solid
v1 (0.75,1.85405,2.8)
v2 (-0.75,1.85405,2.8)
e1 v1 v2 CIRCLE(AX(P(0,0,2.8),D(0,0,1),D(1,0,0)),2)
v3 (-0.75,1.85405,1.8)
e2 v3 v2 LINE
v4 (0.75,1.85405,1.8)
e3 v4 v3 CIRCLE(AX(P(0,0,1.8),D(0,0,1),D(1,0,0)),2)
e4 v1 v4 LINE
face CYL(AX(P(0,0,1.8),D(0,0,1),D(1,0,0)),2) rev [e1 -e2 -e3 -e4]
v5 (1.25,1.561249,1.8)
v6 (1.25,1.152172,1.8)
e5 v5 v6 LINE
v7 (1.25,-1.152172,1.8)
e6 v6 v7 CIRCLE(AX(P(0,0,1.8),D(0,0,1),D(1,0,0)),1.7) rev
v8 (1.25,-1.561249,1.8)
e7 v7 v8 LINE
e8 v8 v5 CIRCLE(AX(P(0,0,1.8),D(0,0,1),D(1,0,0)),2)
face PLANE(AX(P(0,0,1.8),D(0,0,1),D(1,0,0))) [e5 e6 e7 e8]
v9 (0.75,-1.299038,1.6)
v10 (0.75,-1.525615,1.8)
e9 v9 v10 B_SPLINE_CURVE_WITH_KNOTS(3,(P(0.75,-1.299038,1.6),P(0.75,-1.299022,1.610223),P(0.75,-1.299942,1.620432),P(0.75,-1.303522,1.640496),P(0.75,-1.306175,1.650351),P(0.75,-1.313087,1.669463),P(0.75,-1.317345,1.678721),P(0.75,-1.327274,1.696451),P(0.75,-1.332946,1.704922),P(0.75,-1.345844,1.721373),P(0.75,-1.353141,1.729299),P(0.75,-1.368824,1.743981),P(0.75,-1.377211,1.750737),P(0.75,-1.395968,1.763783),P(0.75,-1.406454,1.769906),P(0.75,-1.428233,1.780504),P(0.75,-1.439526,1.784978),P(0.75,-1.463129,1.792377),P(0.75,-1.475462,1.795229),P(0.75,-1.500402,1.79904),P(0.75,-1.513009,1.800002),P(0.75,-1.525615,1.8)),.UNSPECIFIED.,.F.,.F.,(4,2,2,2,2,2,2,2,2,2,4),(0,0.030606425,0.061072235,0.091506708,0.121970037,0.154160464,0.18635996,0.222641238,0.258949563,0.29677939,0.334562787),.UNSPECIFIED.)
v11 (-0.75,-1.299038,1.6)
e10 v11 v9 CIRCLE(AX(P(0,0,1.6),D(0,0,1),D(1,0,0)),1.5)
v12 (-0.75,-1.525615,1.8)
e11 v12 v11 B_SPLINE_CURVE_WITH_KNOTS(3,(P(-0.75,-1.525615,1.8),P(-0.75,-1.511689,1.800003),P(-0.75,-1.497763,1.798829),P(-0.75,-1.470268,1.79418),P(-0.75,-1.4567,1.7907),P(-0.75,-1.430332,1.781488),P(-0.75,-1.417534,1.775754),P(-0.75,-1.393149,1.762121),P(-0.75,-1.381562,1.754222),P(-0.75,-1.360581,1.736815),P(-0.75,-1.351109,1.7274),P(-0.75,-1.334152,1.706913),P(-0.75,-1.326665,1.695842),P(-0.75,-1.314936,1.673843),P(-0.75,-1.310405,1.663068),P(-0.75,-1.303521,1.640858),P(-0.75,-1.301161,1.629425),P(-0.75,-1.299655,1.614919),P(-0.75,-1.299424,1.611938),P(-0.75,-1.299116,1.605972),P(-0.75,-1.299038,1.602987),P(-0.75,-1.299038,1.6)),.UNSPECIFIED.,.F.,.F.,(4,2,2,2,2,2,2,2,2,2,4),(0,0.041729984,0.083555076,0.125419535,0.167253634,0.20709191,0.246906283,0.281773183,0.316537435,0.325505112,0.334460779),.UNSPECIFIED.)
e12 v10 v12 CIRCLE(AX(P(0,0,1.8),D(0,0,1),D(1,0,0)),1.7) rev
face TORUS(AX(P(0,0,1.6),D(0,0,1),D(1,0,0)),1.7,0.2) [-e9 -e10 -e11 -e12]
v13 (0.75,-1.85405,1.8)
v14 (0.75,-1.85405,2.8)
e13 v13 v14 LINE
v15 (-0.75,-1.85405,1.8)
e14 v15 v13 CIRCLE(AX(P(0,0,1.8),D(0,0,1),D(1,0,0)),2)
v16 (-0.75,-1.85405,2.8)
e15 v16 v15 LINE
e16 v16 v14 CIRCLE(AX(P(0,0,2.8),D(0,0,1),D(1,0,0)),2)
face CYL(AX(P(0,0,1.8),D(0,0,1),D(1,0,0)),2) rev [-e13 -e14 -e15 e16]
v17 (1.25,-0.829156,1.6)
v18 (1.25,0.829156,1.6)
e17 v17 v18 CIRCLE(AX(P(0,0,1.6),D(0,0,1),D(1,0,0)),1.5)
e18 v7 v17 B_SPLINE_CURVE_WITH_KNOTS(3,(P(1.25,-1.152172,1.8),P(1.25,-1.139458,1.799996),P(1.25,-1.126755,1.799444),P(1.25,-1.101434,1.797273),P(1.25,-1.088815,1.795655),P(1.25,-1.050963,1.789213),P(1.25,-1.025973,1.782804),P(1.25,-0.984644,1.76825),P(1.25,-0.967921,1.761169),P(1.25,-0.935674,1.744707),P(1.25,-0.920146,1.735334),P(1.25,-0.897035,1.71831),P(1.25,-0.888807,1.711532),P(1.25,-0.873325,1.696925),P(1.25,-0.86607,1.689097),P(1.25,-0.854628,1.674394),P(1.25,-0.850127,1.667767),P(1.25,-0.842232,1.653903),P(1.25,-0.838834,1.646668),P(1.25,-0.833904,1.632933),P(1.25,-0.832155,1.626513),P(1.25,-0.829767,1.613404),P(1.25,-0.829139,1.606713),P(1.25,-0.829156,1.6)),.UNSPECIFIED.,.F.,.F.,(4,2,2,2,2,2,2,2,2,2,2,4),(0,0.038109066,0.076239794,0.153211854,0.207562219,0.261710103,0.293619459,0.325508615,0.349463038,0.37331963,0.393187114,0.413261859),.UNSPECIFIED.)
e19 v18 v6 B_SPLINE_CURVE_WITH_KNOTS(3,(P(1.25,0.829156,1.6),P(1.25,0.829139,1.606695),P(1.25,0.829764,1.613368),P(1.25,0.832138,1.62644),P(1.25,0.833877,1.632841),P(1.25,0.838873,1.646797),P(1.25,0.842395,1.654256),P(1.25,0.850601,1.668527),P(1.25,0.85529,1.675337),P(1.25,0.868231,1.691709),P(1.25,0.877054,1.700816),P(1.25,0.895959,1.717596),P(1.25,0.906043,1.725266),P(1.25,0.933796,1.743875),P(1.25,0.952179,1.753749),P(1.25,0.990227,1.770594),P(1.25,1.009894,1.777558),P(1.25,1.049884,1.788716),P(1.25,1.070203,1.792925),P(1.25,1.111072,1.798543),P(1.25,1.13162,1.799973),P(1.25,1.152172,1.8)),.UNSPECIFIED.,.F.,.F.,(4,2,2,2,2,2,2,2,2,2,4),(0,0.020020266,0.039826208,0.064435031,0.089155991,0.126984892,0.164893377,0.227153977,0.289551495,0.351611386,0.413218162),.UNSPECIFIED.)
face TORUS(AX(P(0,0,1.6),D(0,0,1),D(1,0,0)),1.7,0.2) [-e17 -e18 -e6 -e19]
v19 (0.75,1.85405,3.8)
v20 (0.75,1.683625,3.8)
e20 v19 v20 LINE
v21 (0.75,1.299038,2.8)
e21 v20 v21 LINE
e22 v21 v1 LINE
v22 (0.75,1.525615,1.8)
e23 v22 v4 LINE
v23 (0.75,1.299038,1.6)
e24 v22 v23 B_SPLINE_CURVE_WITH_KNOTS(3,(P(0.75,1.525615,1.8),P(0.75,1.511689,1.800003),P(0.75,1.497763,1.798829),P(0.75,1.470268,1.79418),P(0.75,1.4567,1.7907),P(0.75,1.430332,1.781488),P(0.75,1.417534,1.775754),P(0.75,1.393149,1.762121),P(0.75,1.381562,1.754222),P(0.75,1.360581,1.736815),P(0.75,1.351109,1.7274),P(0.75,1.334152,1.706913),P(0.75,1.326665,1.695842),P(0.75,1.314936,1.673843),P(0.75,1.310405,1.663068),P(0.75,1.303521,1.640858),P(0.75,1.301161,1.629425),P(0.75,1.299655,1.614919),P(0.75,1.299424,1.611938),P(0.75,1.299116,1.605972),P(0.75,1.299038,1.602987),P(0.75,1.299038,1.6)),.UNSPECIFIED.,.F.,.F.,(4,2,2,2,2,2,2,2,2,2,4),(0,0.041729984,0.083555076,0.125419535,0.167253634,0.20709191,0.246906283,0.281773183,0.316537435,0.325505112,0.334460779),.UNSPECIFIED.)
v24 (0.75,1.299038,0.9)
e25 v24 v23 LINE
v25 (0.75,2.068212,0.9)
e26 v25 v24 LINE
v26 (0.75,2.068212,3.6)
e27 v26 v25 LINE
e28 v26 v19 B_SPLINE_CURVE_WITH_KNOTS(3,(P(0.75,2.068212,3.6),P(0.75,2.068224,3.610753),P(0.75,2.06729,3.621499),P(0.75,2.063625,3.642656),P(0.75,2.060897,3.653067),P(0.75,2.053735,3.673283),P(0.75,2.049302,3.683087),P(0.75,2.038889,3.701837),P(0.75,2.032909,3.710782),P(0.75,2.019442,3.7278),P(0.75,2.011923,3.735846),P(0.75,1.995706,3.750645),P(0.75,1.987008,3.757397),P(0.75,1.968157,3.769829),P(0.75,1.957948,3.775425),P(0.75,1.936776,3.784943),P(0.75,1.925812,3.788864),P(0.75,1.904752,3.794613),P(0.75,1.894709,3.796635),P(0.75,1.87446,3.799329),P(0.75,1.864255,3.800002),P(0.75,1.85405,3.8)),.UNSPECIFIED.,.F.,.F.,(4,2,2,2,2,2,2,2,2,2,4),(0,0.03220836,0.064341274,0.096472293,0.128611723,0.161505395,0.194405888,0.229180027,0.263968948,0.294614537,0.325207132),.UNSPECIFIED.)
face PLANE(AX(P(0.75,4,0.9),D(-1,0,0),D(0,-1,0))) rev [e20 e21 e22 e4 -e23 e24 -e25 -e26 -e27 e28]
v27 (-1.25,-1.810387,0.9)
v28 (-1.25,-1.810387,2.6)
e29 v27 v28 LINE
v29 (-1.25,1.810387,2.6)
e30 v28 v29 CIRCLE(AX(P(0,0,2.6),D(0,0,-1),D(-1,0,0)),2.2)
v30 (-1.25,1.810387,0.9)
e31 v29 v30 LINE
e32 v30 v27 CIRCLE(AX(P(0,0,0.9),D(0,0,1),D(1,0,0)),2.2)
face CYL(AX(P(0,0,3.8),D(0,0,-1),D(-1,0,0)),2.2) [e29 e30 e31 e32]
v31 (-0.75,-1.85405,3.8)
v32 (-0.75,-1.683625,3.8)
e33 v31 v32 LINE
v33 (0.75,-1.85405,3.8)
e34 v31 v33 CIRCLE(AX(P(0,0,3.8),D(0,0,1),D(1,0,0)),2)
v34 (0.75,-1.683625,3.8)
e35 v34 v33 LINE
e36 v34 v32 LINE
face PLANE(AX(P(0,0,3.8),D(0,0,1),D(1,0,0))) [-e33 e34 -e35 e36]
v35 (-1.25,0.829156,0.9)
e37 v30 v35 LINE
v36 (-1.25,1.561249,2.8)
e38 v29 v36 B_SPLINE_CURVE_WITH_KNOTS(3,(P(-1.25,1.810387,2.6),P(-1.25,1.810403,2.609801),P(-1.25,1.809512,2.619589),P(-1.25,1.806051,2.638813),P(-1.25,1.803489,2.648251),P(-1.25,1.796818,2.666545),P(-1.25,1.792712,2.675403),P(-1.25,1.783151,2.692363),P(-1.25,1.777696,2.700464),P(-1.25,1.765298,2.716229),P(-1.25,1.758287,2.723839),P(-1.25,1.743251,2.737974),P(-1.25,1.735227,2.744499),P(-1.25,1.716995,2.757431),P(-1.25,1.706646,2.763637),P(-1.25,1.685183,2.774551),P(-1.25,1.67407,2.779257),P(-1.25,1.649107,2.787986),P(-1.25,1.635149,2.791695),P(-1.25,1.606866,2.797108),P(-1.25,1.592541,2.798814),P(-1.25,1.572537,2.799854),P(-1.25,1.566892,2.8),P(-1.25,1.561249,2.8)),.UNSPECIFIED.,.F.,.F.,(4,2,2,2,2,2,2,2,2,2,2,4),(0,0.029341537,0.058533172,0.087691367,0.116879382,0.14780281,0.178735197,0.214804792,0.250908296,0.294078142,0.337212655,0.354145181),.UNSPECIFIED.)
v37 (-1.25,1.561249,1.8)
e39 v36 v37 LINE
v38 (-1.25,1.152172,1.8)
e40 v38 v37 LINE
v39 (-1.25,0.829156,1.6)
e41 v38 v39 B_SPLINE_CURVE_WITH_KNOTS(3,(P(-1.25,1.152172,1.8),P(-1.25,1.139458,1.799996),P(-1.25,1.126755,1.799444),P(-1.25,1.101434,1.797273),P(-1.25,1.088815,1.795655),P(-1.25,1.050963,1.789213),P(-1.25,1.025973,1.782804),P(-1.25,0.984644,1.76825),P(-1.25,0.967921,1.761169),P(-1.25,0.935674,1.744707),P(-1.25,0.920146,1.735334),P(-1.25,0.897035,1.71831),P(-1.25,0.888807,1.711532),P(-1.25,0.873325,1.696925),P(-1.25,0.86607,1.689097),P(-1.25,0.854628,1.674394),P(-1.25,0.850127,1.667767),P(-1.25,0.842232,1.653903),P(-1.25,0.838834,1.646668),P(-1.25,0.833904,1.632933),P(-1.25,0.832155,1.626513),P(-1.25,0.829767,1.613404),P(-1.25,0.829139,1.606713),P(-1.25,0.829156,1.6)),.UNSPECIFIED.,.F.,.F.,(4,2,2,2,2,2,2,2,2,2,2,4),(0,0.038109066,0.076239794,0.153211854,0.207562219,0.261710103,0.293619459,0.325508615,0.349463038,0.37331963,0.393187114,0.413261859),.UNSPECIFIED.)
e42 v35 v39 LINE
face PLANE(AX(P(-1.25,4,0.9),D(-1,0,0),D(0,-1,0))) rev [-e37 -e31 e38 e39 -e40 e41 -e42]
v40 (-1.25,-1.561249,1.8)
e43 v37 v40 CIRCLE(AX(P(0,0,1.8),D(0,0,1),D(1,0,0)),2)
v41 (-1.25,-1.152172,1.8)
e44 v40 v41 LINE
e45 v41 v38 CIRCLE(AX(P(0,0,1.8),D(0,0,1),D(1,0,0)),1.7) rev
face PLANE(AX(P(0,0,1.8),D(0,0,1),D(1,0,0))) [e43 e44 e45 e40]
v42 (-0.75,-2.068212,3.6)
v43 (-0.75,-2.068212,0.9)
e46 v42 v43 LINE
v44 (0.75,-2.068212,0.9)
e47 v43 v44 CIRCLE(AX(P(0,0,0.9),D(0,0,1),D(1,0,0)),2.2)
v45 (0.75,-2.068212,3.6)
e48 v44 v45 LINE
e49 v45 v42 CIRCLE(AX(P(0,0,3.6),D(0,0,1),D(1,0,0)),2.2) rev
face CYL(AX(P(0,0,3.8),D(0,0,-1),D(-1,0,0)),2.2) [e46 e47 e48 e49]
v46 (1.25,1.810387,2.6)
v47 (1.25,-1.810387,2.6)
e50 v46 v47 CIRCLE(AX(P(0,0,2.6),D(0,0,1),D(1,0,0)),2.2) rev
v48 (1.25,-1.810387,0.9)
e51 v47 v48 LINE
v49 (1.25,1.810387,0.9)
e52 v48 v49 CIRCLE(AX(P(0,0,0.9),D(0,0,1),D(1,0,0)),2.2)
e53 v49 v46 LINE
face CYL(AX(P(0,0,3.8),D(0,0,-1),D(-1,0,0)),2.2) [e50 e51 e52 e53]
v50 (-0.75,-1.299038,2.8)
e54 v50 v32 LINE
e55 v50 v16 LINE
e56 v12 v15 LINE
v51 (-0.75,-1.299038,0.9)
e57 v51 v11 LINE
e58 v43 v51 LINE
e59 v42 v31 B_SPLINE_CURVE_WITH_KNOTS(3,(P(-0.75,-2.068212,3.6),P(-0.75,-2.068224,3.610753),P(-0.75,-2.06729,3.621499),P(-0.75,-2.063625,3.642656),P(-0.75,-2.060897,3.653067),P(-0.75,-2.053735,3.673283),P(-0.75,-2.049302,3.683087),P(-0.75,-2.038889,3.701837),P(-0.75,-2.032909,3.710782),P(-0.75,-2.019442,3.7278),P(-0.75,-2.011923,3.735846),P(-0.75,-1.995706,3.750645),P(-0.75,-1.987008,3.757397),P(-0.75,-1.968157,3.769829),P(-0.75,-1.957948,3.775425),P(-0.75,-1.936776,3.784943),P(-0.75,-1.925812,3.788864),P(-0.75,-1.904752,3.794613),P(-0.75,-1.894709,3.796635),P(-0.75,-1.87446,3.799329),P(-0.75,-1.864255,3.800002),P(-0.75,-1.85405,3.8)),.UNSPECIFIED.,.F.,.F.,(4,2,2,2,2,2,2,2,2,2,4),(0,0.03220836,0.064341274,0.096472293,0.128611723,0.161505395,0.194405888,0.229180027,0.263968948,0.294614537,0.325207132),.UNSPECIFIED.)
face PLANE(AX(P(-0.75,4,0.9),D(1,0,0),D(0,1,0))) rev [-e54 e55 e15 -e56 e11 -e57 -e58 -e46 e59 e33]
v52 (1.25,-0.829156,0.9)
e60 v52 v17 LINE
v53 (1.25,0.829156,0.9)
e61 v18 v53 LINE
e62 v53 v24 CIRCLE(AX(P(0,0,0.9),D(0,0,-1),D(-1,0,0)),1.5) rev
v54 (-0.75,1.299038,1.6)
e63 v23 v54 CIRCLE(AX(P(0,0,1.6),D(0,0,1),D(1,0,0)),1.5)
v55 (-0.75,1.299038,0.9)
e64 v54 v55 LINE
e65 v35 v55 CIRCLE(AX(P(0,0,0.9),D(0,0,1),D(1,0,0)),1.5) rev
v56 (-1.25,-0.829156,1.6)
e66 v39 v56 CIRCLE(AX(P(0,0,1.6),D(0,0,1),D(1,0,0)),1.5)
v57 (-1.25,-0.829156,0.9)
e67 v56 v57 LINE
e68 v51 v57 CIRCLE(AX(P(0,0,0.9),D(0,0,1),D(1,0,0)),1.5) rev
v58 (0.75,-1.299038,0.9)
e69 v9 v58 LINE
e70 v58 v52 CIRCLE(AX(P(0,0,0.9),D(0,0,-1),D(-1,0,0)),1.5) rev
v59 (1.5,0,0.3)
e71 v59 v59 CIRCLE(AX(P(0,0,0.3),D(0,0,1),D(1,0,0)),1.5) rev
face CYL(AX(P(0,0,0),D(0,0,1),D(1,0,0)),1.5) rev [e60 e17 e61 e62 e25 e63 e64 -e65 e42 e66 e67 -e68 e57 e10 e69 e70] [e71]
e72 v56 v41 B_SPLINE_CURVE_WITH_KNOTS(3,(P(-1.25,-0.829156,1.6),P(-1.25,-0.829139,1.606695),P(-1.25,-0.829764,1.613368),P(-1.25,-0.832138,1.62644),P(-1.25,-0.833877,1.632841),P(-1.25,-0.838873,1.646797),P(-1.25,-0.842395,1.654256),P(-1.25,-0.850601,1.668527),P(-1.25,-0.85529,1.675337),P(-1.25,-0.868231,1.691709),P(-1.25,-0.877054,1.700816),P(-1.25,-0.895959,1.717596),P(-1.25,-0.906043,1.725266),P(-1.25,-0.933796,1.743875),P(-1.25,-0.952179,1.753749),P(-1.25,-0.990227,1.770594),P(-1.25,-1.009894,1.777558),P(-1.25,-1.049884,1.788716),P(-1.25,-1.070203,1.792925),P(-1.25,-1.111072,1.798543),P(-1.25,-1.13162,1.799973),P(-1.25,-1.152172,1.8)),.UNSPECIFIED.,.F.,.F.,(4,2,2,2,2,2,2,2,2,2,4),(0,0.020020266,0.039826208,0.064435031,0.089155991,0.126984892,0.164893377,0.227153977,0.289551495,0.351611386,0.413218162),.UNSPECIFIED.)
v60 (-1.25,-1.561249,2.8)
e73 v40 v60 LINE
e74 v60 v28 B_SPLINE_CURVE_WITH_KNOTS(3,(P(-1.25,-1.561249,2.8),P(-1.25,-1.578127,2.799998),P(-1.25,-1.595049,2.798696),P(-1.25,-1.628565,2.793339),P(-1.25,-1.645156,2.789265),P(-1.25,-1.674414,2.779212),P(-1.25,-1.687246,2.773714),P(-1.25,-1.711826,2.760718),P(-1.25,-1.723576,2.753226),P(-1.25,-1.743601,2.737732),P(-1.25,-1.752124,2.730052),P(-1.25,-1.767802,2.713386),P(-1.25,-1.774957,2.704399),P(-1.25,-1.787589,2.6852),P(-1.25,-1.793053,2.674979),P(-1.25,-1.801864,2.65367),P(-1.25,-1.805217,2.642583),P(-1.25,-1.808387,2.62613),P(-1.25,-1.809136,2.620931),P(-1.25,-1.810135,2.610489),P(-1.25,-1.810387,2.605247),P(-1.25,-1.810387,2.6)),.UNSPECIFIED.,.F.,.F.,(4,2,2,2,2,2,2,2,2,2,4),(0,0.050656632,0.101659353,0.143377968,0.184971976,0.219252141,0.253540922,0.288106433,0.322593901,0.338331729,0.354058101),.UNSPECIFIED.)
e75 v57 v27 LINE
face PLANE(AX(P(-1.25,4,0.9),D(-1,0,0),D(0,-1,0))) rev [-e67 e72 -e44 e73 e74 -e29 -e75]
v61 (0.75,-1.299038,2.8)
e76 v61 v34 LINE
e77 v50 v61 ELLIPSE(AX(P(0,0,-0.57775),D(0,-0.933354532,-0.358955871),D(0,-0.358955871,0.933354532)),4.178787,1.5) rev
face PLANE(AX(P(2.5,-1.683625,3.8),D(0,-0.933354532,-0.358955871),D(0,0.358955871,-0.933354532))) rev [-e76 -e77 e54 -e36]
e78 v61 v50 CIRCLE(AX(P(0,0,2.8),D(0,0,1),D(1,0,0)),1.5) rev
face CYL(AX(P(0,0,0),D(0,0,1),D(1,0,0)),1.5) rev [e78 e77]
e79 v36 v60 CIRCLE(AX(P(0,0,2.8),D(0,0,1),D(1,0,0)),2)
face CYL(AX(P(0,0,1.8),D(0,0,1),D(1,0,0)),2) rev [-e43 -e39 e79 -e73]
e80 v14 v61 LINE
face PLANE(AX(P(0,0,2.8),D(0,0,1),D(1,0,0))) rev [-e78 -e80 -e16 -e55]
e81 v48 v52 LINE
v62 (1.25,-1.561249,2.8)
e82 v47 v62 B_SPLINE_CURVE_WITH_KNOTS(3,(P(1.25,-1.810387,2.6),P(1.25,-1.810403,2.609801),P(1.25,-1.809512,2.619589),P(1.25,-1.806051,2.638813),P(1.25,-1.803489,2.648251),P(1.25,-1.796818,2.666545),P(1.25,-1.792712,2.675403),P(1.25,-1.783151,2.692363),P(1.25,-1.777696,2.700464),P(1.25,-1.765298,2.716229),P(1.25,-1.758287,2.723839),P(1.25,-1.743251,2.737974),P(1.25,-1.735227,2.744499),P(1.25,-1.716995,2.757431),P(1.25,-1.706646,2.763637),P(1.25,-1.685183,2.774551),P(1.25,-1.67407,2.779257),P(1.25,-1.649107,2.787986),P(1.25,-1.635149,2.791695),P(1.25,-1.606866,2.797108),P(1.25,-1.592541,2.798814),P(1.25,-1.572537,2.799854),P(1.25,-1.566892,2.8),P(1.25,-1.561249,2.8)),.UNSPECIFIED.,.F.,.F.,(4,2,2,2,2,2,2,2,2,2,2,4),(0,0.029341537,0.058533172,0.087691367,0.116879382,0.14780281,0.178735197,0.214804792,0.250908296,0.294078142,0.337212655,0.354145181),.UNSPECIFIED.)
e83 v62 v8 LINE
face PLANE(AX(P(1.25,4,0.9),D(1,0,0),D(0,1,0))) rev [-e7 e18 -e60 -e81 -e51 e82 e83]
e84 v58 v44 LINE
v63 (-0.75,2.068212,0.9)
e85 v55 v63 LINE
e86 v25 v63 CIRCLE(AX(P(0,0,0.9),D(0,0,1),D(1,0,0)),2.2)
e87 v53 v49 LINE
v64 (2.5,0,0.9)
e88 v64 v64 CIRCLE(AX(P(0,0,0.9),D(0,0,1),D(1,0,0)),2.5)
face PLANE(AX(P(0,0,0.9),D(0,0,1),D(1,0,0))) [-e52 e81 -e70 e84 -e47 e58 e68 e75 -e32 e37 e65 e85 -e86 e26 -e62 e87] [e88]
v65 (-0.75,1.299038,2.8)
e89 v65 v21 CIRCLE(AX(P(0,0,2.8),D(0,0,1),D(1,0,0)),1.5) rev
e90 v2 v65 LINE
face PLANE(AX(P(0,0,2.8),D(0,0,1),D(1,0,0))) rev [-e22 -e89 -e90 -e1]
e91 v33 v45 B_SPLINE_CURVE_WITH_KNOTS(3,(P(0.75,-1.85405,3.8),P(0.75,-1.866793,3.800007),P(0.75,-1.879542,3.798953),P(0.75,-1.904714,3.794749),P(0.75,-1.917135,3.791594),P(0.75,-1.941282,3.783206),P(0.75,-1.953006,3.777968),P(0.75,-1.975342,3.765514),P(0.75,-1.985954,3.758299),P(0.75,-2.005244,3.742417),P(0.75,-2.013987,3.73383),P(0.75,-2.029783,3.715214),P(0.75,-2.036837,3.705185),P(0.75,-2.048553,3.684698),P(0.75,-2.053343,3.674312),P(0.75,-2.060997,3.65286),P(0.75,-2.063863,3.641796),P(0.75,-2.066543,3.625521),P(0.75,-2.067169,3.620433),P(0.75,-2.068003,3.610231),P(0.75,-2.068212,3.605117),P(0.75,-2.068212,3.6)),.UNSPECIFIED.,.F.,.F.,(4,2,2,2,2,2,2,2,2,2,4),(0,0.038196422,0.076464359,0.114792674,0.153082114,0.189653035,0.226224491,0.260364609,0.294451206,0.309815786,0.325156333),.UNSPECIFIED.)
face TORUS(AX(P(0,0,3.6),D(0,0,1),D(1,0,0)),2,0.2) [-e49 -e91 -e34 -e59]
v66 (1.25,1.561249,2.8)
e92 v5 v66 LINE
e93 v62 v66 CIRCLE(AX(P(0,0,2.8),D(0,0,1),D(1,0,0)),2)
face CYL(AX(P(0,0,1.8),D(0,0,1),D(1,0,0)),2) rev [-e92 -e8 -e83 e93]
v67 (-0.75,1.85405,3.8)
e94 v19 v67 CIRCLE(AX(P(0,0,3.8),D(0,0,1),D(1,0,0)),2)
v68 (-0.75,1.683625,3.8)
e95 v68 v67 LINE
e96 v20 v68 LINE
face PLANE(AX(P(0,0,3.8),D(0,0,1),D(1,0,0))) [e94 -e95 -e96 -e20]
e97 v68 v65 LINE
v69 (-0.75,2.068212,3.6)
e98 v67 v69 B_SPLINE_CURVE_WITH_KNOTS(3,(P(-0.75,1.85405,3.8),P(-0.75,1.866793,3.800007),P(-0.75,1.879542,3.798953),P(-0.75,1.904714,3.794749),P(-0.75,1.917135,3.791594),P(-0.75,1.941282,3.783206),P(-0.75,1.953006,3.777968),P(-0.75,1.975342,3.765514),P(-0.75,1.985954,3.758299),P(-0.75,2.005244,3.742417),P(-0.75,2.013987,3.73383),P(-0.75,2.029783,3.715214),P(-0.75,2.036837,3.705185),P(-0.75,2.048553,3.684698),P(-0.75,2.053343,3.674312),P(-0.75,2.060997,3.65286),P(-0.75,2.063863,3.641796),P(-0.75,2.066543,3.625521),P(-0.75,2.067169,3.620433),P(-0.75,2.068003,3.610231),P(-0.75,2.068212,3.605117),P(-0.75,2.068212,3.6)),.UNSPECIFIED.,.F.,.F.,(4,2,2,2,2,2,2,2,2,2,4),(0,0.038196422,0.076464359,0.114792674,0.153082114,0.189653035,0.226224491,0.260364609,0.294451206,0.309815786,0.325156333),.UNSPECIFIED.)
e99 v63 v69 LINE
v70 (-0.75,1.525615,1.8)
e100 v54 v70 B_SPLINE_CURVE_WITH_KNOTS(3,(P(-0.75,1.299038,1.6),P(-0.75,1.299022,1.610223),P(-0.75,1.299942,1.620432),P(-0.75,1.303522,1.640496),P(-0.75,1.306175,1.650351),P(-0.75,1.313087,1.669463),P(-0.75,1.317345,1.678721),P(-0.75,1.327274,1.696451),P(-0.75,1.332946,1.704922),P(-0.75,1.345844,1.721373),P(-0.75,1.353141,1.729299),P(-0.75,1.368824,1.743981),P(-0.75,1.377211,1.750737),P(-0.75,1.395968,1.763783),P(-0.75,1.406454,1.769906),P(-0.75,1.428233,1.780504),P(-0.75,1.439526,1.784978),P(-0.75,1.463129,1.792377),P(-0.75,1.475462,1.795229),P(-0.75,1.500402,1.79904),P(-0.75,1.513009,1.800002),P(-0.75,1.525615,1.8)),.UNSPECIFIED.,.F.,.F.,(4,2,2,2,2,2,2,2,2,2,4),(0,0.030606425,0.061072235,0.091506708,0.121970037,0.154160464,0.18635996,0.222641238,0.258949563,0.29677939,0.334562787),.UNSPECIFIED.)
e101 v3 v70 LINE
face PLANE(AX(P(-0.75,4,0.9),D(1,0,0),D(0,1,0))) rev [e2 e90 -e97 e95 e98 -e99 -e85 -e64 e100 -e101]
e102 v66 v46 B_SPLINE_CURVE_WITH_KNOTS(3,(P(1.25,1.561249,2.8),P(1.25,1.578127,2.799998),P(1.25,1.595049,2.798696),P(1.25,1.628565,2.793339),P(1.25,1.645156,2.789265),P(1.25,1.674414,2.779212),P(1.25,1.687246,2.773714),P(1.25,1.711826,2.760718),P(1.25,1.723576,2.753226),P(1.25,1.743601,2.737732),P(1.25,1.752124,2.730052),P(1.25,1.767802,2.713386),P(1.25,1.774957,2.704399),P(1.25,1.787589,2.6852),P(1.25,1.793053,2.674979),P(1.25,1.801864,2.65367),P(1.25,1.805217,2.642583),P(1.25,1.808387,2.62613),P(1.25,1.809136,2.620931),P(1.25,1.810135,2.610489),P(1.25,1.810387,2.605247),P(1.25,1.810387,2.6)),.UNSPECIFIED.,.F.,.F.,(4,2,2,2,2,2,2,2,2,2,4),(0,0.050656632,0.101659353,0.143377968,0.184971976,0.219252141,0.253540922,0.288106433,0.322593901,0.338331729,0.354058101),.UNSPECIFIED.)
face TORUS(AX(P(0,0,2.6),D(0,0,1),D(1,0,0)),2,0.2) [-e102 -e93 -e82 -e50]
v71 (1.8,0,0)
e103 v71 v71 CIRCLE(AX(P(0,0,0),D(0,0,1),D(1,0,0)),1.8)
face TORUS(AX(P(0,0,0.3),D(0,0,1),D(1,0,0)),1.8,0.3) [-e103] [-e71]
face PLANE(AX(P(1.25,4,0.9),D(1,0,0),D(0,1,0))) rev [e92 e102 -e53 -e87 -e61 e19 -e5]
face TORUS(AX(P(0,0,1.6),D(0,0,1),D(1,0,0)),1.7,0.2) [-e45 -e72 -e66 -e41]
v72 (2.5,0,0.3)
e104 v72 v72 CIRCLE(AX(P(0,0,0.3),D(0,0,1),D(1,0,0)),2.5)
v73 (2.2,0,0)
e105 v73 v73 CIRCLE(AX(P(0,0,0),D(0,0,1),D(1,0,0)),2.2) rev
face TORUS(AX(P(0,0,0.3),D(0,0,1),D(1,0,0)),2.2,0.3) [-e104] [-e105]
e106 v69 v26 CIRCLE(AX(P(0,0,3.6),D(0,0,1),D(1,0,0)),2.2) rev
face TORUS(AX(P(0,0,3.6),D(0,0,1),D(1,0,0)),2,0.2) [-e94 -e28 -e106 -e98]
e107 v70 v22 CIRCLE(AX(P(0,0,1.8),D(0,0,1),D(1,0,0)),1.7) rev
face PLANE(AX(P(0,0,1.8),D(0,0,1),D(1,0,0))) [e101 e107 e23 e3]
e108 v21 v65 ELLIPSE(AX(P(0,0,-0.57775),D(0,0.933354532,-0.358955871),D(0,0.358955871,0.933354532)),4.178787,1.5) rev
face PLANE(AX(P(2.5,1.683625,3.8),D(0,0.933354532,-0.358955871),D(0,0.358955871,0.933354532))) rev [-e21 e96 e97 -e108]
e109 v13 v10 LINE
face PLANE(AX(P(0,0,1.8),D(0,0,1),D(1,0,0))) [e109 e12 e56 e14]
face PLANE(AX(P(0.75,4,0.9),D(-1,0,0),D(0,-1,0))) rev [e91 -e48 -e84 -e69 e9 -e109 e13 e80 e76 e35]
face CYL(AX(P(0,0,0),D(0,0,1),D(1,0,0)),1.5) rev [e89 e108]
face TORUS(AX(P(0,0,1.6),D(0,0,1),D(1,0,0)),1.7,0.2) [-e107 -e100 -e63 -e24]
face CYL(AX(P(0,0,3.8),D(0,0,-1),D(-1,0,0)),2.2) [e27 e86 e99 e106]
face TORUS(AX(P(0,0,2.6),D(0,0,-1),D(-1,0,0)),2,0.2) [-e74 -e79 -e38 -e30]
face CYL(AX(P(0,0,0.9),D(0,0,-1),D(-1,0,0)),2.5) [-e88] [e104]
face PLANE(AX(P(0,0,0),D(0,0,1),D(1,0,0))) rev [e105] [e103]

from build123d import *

# Parameters (mm, degrees)
SKETCH_1_R               = 2.5
EXTRUDE_1_DEPTH          = 0.9
SKETCH_2_R               = 2.2
EXTRUDE_2_DEPTH          = 2.9
CUT_EXTRUDE_1_DEPTH      = 6.190375709
CUT_EXTRUDE_1_DEPTH_BACK = 6.190375709
SKETCH_3_R               = 1.5
SKETCH_4_W               = 0.5
SKETCH_4_H               = 8
CUT_EXTRUDE_2_DEPTH      = 2.9
SKETCH_5_W               = 2
SKETCH_5_H               = 6
CUT_EXTRUDE_3_DEPTH      = 1
SKETCH_6_R               = 2
CUT_EXTRUDE_4_DEPTH      = 1
CUT_EXTRUDE_5_DEPTH      = 6.590393546
FILLET_1_R               = 0.3
FILLET_2_R               = 0.2


with BuildPart() as part:
    # Эскиз1 → Бобышка-Вытянуть1 (new body)
    with BuildSketch(Plane.XY):
        Circle(SKETCH_1_R)
    extrude(amount=EXTRUDE_1_DEPTH)

    # Эскиз2 → Бобышка-Вытянуть2 (add)
    with BuildSketch(Plane.XY.offset(0.9)):
        Circle(SKETCH_2_R)
    extrude(amount=EXTRUDE_2_DEPTH)

    # Эскиз3 → Вырез-Вытянуть1 (cut, two sides: drawn at the far end of the back side and taken through both)
    with BuildSketch(Plane.XY.offset(3.8).offset(-CUT_EXTRUDE_1_DEPTH_BACK)):
        Circle(SKETCH_3_R)
    extrude(amount=CUT_EXTRUDE_1_DEPTH + CUT_EXTRUDE_1_DEPTH_BACK, mode=Mode.SUBTRACT)

    # Эскиз4 → Вырез-Вытянуть2 (cut)
    with BuildSketch(Plane.XY.offset(3.8)):
        with Locations((-1, 0)):
            Rectangle(SKETCH_4_W, SKETCH_4_H)
        with Locations((1, 0)):
            Rectangle(SKETCH_4_W, SKETCH_4_H)
    extrude(amount=-CUT_EXTRUDE_2_DEPTH, mode=Mode.SUBTRACT)

    # Эскиз5 → Вырез-Вытянуть3 (cut)
    with BuildSketch(Plane.XY.offset(3.8)):
        with Locations((-2.25, -1.189613301)):
            Rectangle(SKETCH_5_W, SKETCH_5_H)
        with Locations((2.25, -1.189613301)):
            Rectangle(SKETCH_5_W, SKETCH_5_H)
    extrude(amount=-CUT_EXTRUDE_3_DEPTH, mode=Mode.SUBTRACT)

    # Эскиз6 → Вырез-Вытянуть4 (cut)
    with BuildSketch(Plane.XY.offset(2.8)):
        Circle(SKETCH_6_R)
    extrude(amount=-CUT_EXTRUDE_4_DEPTH, mode=Mode.SUBTRACT)

    # Эскиз7 → Вырез-Вытянуть5 (cut, through all)
    with BuildSketch(Plane.ZY.offset(0.75)):
        Polygon((3.8, 1.683624947), (2.8, 1.299038106), (3.8, 1.299038106), align=None)
        Polygon((3.8, -1.683624947), (2.8, -1.299038106), (3.8, -1.299038106), align=None)
    extrude(amount=-CUT_EXTRUDE_5_DEPTH, mode=Mode.SUBTRACT)

    # Скругление1
    fillet_1_edges = [part.edges().sort_by_distance(p)[0] for p in [
        (-1.5, 0, 0),
        (-2.5, 0, 0),
    ]]
    fillet(fillet_1_edges, radius=FILLET_1_R)

    # Скругление2
    fillet_2_edges = [part.edges().sort_by_distance(p)[0] for p in [
        (1.436140662, 0.433012702, 1.8),
        (0, -1.5, 1.8),
        (0, 1.5, 1.8),
        (-1.5, 0, 1.8),
        (0, 2.2, 3.8),
        (0, -2.2, 3.8),
        (2.2, 0, 2.8),
        (-2.2, 0, 2.8),
    ]]
    fillet(fillet_2_edges, radius=FILLET_2_R - 0.0001)  # a hair under: the kernel refuses the full size


solid = part.part
